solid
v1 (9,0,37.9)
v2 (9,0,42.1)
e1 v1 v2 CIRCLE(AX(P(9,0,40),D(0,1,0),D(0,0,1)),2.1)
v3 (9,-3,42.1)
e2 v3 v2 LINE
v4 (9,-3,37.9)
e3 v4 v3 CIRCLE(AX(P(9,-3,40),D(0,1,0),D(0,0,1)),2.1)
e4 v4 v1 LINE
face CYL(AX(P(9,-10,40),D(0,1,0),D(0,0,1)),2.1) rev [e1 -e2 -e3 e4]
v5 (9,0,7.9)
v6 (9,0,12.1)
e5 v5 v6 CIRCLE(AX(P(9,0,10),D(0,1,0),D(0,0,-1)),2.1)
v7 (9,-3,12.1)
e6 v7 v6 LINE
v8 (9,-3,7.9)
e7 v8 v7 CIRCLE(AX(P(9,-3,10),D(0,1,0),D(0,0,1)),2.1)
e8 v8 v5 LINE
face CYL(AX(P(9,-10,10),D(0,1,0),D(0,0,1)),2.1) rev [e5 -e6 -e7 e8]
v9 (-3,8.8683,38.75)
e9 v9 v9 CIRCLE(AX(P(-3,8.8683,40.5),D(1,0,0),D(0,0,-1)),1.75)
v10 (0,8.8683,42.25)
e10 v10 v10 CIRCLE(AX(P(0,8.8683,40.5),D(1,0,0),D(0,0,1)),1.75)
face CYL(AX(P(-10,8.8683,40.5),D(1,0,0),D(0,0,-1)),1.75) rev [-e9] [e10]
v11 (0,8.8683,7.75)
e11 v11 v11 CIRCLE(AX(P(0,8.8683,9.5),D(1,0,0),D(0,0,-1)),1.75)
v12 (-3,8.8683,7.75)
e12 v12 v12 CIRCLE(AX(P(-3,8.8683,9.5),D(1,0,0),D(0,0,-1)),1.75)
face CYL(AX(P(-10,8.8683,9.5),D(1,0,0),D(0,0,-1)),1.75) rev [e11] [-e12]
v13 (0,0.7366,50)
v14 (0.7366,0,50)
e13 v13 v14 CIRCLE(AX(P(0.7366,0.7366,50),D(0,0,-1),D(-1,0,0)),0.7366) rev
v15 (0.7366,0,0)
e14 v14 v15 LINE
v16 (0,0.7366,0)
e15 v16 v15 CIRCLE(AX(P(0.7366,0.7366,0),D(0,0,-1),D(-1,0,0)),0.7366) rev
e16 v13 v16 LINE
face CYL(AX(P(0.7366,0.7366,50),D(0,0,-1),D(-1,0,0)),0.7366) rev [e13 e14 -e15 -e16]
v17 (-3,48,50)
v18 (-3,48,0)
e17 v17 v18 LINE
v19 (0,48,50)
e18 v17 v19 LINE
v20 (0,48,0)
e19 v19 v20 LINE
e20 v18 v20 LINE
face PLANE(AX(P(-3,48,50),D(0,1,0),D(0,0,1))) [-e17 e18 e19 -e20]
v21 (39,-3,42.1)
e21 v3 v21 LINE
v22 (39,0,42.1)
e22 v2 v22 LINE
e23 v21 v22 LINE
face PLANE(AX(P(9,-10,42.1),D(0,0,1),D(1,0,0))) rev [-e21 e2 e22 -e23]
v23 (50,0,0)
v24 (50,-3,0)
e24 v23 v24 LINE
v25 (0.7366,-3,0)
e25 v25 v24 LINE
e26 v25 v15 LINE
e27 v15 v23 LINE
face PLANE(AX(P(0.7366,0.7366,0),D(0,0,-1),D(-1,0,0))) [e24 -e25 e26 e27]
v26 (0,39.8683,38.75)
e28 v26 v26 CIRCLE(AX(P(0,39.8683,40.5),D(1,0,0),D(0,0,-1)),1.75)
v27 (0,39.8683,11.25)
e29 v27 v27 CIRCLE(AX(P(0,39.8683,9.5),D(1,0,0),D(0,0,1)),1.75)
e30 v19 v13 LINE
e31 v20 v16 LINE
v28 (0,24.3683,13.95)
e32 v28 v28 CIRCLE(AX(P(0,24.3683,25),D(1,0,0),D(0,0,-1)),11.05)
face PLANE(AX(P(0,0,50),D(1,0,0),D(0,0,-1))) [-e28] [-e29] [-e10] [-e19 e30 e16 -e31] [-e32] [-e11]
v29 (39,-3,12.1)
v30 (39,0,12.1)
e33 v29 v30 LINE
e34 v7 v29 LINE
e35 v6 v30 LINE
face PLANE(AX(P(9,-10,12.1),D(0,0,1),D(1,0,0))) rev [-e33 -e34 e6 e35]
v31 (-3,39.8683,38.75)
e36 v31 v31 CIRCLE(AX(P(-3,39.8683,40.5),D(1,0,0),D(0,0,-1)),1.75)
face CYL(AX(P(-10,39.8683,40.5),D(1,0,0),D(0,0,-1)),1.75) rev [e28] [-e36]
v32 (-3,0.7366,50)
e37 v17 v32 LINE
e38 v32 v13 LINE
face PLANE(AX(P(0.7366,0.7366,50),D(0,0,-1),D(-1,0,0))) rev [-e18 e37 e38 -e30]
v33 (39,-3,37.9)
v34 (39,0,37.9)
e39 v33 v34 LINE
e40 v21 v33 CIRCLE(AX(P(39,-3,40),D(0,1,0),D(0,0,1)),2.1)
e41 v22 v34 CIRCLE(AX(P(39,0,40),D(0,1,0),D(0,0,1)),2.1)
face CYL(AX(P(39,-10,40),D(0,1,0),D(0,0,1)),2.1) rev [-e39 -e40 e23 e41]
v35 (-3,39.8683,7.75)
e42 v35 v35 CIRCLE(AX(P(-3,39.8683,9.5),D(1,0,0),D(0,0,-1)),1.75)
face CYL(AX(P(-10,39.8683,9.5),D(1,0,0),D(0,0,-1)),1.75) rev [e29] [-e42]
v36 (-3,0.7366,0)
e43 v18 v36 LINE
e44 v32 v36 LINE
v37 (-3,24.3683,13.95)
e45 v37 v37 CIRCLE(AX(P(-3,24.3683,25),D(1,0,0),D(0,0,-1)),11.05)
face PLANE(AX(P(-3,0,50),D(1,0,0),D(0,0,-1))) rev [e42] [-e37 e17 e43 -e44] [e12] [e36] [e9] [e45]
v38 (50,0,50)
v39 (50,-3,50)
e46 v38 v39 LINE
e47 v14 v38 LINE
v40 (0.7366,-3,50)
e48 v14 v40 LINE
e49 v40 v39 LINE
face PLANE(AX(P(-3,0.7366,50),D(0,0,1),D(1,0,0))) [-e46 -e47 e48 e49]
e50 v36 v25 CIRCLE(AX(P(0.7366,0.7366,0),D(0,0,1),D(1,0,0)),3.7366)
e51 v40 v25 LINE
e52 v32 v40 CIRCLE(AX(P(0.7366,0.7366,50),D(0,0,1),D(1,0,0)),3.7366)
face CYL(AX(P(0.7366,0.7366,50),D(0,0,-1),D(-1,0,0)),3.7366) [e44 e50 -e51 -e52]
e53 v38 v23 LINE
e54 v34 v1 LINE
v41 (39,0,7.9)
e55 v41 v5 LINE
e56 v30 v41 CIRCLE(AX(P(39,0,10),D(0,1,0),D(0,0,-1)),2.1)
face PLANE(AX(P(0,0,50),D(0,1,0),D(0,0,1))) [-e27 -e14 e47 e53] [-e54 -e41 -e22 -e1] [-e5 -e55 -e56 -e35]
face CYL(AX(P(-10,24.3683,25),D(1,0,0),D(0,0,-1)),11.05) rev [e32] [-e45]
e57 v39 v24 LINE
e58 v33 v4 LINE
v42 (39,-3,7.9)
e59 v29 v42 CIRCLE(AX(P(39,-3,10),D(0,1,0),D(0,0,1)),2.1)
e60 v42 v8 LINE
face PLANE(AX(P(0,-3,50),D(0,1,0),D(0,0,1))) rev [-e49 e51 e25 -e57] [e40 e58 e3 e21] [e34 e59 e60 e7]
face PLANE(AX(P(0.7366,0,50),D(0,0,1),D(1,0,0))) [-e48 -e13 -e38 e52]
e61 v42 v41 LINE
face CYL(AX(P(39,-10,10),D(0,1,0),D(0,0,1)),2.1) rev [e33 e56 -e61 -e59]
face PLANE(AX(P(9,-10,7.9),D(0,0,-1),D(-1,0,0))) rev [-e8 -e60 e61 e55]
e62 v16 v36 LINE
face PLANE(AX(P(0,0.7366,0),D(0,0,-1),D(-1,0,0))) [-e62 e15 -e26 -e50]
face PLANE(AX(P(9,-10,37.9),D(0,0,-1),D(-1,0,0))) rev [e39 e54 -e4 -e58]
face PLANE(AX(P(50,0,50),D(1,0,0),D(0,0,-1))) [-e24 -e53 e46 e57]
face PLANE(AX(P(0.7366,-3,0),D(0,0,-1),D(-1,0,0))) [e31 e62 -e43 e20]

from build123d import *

# Parameters (mm, degrees)
SM_BASE_FLANGE_1_DEPTH = 50
SKETCH_7_R             = 11.05
SKETCH_7_R_2           = 1.75
CUT_EXTRUDE_1_DEPTH    = 10
CUT_EXTRUDE_2_DEPTH    = 10


# Sheet-metal steps are written as plain solids
with BuildPart() as part:
    # Sketch 2 → 基体-法兰1 (new body)
    with BuildSketch(Plane.XY):
        with BuildLine():
            Line((50, 0), (0.7366, 0))
            ThreePointArc((0.7366, 0), (0.215745145, 0.215745145), (0, 0.7366))
            Line((0, 0.7366), (0, 48))
            Line((0, 48), (-3, 48))
            Line((-3, 48), (-3, 0.7366))
            ThreePointArc((-3, 0.7366), (-1.905575199, -1.905575199), (0.7366, -3))
            Line((0.7366, -3), (50, -3))
            Line((50, -3), (50, 0))
        make_face()
    extrude(amount=SM_BASE_FLANGE_1_DEPTH)

    # 草图7 → 切除-拉伸1 (cut)
    with BuildSketch(Plane(origin=(0, 0, 0), x_dir=(0, 0, -1), z_dir=(1, 0, 0))):
        with Locations((-25, 24.3683)):
            Circle(SKETCH_7_R)
        with Locations((-40.5, 39.8683)):
            Circle(SKETCH_7_R_2)
        with Locations((-9.5, 39.8683)):
            Circle(SKETCH_7_R_2)
        with Locations((-40.5, 8.8683)):
            Circle(SKETCH_7_R_2)
        with Locations((-9.5, 8.8683)):
            Circle(SKETCH_7_R_2)
    extrude(amount=-CUT_EXTRUDE_1_DEPTH, mode=Mode.SUBTRACT)

    # 草图8 → 切除-拉伸2 (cut)
    with BuildSketch(Plane(origin=(0, 0, 0), x_dir=(1, 0, 0), z_dir=(0, 1, 0))):
        with BuildLine():
            Line((9, -12.1), (39, -12.1))
            ThreePointArc((39, -12.1), (41.1, -10), (39, -7.9))
            Line((39, -7.9), (9, -7.9))
            ThreePointArc((9, -7.9), (6.9, -10), (9, -12.1))
        make_face()
        with BuildLine():
            Line((9, -42.1), (39, -42.1))
            ThreePointArc((39, -42.1), (41.1, -40), (39, -37.9))
            Line((39, -37.9), (9, -37.9))
            ThreePointArc((9, -37.9), (6.9, -40), (9, -42.1))
        make_face()
    extrude(amount=-CUT_EXTRUDE_2_DEPTH, mode=Mode.SUBTRACT)


solid = part.part
